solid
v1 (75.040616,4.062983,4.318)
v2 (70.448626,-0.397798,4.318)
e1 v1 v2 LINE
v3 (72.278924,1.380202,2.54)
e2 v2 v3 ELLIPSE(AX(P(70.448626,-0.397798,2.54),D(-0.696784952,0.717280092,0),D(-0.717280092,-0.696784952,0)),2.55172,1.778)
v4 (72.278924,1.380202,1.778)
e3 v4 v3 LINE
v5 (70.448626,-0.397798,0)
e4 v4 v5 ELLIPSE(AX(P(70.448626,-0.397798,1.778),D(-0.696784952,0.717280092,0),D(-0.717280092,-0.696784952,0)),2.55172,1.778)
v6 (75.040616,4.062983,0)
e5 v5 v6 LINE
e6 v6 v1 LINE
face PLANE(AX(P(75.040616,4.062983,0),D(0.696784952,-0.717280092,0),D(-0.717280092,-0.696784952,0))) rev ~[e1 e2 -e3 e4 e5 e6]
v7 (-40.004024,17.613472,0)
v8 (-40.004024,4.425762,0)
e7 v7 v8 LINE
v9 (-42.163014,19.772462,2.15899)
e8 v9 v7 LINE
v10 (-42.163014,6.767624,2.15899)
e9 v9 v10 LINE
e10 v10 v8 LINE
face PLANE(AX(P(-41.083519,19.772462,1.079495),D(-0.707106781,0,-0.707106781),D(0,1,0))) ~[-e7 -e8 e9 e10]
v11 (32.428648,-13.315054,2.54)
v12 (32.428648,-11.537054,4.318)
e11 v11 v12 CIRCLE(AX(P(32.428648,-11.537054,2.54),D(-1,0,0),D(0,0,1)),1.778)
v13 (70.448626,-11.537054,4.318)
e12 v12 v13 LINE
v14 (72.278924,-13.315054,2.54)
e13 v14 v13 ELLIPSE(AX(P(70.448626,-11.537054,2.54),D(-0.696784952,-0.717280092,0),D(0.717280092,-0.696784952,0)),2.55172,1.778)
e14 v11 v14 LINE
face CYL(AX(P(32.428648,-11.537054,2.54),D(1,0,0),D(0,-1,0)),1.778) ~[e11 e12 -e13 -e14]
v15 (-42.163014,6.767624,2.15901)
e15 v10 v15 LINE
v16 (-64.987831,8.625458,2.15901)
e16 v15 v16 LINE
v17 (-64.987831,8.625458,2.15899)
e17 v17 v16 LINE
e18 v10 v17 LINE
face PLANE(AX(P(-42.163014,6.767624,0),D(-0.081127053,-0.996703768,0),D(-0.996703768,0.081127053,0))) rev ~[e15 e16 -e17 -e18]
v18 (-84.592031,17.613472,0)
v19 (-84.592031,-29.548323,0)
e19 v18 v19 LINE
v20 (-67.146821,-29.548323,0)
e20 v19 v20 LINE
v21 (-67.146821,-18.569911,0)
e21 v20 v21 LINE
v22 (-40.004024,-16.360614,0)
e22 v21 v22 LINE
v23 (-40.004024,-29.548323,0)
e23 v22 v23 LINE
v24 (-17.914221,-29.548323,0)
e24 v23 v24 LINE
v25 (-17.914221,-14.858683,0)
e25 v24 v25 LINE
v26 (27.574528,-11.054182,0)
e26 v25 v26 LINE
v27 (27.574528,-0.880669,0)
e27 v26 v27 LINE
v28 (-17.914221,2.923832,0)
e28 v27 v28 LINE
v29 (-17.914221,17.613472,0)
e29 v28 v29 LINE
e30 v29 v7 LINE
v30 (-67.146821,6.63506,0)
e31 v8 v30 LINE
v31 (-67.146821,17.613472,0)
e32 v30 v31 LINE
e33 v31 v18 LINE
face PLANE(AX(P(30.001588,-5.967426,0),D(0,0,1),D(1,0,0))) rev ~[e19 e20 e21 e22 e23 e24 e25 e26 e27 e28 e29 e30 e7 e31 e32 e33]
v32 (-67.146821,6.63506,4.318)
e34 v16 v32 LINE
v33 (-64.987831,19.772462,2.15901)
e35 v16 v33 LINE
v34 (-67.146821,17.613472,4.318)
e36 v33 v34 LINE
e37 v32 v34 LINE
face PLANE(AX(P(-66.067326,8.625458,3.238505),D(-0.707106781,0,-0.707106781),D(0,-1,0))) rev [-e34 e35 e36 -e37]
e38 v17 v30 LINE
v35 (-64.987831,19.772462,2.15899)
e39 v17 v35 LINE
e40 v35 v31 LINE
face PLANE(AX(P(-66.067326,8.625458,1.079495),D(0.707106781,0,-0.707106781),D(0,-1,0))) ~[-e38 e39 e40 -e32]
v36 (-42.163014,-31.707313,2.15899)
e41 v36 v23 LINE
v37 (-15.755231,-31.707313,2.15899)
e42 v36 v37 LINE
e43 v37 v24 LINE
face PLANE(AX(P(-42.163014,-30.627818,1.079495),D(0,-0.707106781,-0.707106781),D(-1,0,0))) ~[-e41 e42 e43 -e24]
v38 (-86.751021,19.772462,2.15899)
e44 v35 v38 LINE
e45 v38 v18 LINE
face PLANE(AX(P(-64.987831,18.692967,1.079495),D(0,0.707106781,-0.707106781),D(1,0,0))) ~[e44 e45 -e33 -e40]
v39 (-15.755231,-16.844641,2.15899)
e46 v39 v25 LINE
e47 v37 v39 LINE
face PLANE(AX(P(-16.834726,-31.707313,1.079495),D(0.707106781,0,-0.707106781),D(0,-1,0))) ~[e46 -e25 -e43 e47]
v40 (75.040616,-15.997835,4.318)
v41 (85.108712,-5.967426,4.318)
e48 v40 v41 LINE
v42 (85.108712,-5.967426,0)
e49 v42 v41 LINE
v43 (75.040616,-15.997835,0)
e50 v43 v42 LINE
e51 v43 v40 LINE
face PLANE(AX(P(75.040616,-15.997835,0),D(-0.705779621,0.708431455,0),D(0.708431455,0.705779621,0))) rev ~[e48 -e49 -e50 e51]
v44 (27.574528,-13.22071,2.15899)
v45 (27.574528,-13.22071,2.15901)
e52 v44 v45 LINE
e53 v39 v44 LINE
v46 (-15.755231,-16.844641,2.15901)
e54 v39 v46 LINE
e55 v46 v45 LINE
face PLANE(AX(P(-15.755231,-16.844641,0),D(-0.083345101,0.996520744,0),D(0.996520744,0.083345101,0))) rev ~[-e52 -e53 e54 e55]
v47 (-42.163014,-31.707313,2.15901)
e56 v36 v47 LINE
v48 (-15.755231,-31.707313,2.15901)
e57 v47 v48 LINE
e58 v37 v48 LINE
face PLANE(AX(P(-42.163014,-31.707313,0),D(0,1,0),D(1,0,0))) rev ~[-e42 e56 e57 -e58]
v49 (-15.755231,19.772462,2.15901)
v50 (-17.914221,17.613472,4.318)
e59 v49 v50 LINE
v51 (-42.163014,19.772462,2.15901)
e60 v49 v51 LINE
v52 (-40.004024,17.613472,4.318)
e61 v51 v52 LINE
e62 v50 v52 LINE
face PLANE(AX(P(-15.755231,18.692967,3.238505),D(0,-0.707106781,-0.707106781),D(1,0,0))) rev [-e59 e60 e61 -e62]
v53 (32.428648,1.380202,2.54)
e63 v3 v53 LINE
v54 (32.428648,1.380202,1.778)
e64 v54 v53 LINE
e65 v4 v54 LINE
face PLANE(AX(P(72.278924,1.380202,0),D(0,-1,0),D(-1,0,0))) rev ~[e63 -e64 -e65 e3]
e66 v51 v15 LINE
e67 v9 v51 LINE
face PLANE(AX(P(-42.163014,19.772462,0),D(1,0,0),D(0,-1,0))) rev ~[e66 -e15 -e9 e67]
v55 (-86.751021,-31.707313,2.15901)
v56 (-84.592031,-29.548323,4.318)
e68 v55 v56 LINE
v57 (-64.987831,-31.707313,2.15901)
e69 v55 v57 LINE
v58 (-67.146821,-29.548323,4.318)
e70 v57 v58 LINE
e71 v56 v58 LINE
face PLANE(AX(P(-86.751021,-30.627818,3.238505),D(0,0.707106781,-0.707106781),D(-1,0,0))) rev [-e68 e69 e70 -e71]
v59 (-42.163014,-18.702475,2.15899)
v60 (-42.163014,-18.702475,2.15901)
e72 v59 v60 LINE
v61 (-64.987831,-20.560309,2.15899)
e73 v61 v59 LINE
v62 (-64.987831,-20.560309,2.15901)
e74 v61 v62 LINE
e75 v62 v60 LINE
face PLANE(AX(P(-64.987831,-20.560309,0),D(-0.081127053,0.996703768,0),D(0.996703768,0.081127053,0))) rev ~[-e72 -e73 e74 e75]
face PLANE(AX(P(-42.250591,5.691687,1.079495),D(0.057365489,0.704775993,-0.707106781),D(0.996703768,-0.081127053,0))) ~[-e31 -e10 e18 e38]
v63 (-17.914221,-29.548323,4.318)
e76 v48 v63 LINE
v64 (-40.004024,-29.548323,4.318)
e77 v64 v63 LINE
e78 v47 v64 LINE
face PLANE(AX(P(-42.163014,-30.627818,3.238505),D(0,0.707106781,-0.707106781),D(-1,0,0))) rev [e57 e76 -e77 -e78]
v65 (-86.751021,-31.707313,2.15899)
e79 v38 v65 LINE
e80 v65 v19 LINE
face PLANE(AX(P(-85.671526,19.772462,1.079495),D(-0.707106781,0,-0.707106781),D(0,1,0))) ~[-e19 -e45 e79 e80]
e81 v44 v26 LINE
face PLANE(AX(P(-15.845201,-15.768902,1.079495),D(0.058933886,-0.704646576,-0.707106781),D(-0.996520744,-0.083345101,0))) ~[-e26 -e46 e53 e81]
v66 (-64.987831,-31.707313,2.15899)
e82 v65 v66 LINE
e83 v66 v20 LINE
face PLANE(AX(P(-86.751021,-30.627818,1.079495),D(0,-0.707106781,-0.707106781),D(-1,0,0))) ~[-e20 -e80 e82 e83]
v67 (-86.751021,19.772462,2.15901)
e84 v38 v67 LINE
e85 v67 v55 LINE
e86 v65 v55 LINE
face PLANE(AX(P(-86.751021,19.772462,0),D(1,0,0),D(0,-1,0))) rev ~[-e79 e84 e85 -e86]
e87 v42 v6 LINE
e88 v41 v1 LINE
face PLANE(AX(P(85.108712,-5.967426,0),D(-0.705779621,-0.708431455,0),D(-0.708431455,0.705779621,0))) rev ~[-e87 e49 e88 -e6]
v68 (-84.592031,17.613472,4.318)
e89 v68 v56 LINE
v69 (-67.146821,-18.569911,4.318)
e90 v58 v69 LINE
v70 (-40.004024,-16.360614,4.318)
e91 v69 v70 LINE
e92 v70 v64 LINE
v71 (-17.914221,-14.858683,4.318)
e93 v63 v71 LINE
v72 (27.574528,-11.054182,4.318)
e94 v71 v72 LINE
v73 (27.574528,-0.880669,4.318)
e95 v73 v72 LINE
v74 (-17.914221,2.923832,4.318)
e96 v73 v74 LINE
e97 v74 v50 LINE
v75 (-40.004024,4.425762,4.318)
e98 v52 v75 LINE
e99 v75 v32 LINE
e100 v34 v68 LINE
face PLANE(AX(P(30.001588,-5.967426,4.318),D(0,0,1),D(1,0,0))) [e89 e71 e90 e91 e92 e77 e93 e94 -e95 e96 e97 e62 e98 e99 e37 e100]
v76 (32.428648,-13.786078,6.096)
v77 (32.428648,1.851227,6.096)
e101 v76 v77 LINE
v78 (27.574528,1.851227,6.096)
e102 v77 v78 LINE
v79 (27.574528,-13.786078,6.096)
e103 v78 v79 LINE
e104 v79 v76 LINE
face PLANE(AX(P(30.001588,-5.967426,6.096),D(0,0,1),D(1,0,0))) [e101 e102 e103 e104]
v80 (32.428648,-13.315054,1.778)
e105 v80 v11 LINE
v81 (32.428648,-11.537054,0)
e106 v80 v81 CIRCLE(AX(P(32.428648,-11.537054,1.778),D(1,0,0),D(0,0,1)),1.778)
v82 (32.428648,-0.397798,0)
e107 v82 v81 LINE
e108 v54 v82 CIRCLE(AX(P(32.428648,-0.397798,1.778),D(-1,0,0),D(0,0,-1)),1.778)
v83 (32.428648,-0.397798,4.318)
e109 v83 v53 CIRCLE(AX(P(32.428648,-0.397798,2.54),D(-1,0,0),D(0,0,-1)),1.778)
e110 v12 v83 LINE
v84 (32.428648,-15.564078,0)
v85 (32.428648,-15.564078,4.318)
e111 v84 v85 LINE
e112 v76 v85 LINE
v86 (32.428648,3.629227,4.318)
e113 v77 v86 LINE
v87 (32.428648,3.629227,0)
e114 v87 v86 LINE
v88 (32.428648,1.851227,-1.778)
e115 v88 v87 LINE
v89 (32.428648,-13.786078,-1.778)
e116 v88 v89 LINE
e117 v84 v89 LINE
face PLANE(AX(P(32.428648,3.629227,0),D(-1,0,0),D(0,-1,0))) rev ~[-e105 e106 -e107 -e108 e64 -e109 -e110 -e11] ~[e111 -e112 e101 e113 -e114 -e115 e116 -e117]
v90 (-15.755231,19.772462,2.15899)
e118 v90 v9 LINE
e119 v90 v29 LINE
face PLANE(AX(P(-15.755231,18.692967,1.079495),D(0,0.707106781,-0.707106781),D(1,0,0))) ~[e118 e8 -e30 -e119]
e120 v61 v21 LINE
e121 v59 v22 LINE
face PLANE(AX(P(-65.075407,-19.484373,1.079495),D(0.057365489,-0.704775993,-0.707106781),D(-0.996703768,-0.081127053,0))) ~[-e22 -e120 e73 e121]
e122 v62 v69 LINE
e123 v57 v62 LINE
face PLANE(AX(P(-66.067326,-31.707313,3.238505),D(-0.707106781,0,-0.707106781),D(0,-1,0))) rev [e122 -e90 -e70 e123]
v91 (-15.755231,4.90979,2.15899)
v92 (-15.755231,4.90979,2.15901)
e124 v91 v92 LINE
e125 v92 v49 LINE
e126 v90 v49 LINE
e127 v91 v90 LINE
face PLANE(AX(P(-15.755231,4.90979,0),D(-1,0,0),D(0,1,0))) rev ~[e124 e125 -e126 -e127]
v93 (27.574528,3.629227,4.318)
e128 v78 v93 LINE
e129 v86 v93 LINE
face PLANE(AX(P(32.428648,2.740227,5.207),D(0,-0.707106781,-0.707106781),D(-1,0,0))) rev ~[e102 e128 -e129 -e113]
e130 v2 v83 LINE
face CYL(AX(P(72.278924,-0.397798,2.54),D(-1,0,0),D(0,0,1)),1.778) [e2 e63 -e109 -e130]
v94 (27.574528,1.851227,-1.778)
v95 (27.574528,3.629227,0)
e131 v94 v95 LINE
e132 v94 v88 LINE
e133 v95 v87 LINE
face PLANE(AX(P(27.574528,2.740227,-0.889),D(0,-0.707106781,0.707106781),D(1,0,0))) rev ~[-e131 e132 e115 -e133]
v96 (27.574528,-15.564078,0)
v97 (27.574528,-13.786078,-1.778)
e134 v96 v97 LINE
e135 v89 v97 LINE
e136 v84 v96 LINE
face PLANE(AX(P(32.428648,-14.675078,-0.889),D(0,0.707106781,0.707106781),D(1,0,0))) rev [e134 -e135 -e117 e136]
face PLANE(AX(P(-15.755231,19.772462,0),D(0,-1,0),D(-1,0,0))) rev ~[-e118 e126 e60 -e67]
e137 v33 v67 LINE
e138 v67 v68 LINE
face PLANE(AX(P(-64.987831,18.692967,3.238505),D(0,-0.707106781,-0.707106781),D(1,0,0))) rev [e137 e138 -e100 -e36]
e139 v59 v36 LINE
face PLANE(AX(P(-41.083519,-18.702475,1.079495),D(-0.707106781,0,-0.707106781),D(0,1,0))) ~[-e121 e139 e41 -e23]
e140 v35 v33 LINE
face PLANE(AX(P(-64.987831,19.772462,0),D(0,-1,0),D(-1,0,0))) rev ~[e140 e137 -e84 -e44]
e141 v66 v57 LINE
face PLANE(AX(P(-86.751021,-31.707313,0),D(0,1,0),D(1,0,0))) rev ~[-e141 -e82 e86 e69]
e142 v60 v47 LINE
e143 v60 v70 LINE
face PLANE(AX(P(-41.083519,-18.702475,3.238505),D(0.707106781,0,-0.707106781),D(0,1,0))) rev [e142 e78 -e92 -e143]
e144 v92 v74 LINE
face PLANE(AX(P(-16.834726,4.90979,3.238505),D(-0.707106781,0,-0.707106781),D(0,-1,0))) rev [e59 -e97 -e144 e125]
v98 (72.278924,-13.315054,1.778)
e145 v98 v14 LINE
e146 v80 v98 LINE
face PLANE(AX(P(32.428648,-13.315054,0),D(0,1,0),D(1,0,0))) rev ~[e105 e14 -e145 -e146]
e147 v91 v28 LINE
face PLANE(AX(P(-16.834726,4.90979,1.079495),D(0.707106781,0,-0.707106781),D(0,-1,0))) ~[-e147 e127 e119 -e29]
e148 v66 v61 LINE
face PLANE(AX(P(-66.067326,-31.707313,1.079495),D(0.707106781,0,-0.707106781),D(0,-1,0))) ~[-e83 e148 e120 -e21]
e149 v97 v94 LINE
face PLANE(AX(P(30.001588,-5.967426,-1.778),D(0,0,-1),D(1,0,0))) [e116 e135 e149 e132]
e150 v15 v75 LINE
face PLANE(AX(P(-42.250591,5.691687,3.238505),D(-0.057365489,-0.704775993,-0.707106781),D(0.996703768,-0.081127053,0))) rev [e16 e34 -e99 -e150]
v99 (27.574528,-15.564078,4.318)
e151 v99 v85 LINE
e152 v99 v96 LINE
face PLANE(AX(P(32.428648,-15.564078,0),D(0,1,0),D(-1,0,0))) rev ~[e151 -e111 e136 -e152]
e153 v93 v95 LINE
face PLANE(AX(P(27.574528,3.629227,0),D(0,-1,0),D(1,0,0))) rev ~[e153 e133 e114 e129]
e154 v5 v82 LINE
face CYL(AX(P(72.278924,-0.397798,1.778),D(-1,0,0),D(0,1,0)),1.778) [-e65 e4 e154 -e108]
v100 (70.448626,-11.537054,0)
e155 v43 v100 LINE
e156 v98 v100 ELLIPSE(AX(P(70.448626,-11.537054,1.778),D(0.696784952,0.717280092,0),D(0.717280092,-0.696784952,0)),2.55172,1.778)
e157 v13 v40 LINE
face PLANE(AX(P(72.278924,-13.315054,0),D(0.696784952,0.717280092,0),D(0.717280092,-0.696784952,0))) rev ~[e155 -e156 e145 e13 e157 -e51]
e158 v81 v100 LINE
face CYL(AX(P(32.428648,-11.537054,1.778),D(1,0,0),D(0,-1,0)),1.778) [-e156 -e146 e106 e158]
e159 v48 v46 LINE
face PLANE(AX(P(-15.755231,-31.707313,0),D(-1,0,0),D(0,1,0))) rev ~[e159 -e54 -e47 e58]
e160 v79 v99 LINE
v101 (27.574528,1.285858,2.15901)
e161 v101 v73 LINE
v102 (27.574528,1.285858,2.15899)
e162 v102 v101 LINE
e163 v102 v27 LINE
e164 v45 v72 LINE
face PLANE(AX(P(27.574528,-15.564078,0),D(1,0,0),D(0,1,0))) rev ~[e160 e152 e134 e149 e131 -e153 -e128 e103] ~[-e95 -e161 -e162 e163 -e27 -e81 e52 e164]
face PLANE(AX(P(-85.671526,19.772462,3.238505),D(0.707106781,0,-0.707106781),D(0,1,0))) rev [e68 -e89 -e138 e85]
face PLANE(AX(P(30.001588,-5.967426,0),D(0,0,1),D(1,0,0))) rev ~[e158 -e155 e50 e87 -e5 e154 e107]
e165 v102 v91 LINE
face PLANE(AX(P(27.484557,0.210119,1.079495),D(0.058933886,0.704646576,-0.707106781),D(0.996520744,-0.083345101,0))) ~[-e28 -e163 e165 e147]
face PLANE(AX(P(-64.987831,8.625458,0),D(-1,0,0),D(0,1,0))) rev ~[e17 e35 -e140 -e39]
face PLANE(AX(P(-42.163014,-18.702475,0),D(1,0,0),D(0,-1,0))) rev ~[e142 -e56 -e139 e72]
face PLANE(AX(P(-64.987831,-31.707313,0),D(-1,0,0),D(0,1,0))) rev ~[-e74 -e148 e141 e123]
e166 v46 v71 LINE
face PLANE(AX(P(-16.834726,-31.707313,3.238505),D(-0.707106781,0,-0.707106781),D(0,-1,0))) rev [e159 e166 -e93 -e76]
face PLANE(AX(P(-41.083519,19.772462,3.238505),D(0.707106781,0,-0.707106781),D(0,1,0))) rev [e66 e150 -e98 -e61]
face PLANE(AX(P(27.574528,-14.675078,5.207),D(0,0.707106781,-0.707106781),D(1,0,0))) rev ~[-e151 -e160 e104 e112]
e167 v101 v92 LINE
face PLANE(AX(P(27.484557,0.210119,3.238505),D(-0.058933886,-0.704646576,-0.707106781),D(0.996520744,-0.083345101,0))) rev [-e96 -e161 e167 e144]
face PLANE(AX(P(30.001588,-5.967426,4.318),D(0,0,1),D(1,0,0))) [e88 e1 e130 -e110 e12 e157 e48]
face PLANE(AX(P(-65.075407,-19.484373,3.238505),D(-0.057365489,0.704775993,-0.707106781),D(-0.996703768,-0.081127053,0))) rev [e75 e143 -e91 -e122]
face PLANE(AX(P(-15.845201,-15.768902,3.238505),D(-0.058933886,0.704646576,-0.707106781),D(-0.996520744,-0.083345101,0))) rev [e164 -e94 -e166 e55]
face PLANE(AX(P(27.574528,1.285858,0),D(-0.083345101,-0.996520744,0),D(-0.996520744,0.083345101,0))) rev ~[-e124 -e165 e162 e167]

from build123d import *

# Parameters (mm, degrees)
F2_DEPTH = 4.318
F3_SIZE  = 2.15899
F5_DEPTH = 1.778
F7_DEPTH = 1.778
F8_R     = 1.778
F9_SIZE  = 1.778


# Not quite as in the source:
# - a fillet or chamfer is up to 0.001 mm smaller than in the source, because OpenCascade refuses the exact size


with BuildPart() as f2:
    # F0 (on Top) → F2 (new body)
    with BuildSketch(Plane.XY):
        Polygon((27.5745280087, 3.6292271689), (27.5745280087, 1.2858584523), (27.5745280087, -13.2207097486), (27.5745280087, -15.5640784651), (32.4286483228, -15.5640784651), (32.4286483228, -13.3150536567), (32.4286483228, 1.3802023605), (32.4286483228, 3.6292271689), align=None)
        Polygon((72.2789242864, 1.3802023605), (32.4286483228, 1.3802023605), (32.4286483228, -13.3150536567), (72.2789242864, -13.3150536567), (75.0406160951, -15.9978345037), (85.1087123156, -5.9674256481), (75.0406160951, 4.0629832074), align=None)
        Polygon((-64.9878308177, 19.7724616155), (-86.7510214448, 19.7724616155), (-86.7510214448, -31.7073129117), (-64.9878308177, -31.7073129117), (-64.9878308177, -20.5603092909), (-42.1630144119, -18.7024753541), (-42.1630144119, -31.7073129117), (-15.7552305609, -31.7073129117), (-15.7552305609, -16.8446414173), (27.5745280087, -13.2207097486), (27.5745280087, 1.2858584523), (-15.7552305609, 4.909790121), (-15.7552305609, 19.7724616155), (-42.1630144119, 19.7724616155), (-42.1630144119, 6.7676240578), (-64.9878308177, 8.6254579946), align=None)
    extrude(amount=F2_DEPTH)

    # F3 (size 2.159 in the source; OpenCascade refuses exactly that, so slightly less here)
    f3_edges = [f2.edges().sort_by_distance(p)[0] for p in [
        (-53.575423, -19.631392, 4.318),
        (-42.163014, -25.204894, 4.318),
        (-28.959122, -31.707313, 4.318),
        (-15.755231, -24.275977, 4.318),
        (5.909649, -15.032676, 4.318),
        (5.909649, 3.097824, 4.318),
        (-15.755231, 12.341126, 4.318),
        (-28.959122, 19.772462, 4.318),
        (-42.163014, 13.270043, 4.318),
        (-53.575423, 7.696541, 4.318),
        (-64.987831, 14.19896, 4.318),
        (-75.869426, 19.772462, 4.318),
        (-86.751021, -5.967426, 4.318),
        (-75.869426, -31.707313, 4.318),
        (-64.987831, -26.133811, 4.318),
        (-28.959122, -31.707313, 0),
        (-15.755231, -24.275977, 0),
        (5.909649, -15.032676, 0),
        (-42.163014, -25.204894, 0),
        (-53.575423, -19.631392, 0),
        (-75.869426, -31.707313, 0),
        (-64.987831, -26.133811, 0),
        (-86.751021, -5.967426, 0),
        (-75.869426, 19.772462, 0),
        (-64.987831, 14.19896, 0),
        (-53.575423, 7.696541, 0),
        (-15.755231, 12.341126, 0),
        (5.909649, 3.097824, 0),
        (-42.163014, 13.270043, 0),
        (-28.959122, 19.772462, 0),
    ]]
    chamfer(f3_edges, length=F3_SIZE)

    # F4 (on face) → F5 (join)
    with BuildSketch(Plane.XY.offset(4.318)):
        Polygon((32.4286483228, 3.6292271689), (27.5745280087, 3.6292271689), (27.5745280087, 1.2858584523), (27.5745280087, -0.8806694518), (27.5745280087, -11.0541818444), (27.5745280087, -13.2207097486), (27.5745280087, -15.5640784651), (32.4286483228, -15.5640784651), (32.4286483228, -13.3150536567), (32.4286483228, 1.3802023605), align=None)
    extrude(amount=F5_DEPTH)

    # F6 (on face) → F7 (join)
    with BuildSketch(Plane(origin=(0, 0, 0), x_dir=(1, 0, 0), z_dir=(0, 0, -1))):
        Polygon((32.4286483228, 15.5640784651), (27.5745280087, 15.5640784651), (27.5745280087, 11.0541818444), (27.5745280087, 0.8806694518), (27.5745280087, -3.6292271689), (32.4286483228, -3.6292271689), (32.4286483228, -1.3802023605), (32.4286483228, 13.3150536567), align=None)
    extrude(amount=F7_DEPTH)

    # F8
    f8_edges = [f2.edges().sort_by_distance(p)[0] for p in [
        (52.353786, 1.380202, 0),
        (52.353786, -13.315054, 0),
        (52.353786, 1.380202, 4.318),
        (52.353786, -13.315054, 4.318),
    ]]
    fillet(f8_edges, radius=F8_R)

    # F9
    f9_edges = [f2.edges().sort_by_distance(p)[0] for p in [
        (30.001588, -15.564078, -1.778),
        (30.001588, -15.564078, 6.096),
        (30.001588, 3.629227, 6.096),
        (30.001588, 3.629227, -1.778),
    ]]
    chamfer(f9_edges, length=F9_SIZE)


solid = f2.part
